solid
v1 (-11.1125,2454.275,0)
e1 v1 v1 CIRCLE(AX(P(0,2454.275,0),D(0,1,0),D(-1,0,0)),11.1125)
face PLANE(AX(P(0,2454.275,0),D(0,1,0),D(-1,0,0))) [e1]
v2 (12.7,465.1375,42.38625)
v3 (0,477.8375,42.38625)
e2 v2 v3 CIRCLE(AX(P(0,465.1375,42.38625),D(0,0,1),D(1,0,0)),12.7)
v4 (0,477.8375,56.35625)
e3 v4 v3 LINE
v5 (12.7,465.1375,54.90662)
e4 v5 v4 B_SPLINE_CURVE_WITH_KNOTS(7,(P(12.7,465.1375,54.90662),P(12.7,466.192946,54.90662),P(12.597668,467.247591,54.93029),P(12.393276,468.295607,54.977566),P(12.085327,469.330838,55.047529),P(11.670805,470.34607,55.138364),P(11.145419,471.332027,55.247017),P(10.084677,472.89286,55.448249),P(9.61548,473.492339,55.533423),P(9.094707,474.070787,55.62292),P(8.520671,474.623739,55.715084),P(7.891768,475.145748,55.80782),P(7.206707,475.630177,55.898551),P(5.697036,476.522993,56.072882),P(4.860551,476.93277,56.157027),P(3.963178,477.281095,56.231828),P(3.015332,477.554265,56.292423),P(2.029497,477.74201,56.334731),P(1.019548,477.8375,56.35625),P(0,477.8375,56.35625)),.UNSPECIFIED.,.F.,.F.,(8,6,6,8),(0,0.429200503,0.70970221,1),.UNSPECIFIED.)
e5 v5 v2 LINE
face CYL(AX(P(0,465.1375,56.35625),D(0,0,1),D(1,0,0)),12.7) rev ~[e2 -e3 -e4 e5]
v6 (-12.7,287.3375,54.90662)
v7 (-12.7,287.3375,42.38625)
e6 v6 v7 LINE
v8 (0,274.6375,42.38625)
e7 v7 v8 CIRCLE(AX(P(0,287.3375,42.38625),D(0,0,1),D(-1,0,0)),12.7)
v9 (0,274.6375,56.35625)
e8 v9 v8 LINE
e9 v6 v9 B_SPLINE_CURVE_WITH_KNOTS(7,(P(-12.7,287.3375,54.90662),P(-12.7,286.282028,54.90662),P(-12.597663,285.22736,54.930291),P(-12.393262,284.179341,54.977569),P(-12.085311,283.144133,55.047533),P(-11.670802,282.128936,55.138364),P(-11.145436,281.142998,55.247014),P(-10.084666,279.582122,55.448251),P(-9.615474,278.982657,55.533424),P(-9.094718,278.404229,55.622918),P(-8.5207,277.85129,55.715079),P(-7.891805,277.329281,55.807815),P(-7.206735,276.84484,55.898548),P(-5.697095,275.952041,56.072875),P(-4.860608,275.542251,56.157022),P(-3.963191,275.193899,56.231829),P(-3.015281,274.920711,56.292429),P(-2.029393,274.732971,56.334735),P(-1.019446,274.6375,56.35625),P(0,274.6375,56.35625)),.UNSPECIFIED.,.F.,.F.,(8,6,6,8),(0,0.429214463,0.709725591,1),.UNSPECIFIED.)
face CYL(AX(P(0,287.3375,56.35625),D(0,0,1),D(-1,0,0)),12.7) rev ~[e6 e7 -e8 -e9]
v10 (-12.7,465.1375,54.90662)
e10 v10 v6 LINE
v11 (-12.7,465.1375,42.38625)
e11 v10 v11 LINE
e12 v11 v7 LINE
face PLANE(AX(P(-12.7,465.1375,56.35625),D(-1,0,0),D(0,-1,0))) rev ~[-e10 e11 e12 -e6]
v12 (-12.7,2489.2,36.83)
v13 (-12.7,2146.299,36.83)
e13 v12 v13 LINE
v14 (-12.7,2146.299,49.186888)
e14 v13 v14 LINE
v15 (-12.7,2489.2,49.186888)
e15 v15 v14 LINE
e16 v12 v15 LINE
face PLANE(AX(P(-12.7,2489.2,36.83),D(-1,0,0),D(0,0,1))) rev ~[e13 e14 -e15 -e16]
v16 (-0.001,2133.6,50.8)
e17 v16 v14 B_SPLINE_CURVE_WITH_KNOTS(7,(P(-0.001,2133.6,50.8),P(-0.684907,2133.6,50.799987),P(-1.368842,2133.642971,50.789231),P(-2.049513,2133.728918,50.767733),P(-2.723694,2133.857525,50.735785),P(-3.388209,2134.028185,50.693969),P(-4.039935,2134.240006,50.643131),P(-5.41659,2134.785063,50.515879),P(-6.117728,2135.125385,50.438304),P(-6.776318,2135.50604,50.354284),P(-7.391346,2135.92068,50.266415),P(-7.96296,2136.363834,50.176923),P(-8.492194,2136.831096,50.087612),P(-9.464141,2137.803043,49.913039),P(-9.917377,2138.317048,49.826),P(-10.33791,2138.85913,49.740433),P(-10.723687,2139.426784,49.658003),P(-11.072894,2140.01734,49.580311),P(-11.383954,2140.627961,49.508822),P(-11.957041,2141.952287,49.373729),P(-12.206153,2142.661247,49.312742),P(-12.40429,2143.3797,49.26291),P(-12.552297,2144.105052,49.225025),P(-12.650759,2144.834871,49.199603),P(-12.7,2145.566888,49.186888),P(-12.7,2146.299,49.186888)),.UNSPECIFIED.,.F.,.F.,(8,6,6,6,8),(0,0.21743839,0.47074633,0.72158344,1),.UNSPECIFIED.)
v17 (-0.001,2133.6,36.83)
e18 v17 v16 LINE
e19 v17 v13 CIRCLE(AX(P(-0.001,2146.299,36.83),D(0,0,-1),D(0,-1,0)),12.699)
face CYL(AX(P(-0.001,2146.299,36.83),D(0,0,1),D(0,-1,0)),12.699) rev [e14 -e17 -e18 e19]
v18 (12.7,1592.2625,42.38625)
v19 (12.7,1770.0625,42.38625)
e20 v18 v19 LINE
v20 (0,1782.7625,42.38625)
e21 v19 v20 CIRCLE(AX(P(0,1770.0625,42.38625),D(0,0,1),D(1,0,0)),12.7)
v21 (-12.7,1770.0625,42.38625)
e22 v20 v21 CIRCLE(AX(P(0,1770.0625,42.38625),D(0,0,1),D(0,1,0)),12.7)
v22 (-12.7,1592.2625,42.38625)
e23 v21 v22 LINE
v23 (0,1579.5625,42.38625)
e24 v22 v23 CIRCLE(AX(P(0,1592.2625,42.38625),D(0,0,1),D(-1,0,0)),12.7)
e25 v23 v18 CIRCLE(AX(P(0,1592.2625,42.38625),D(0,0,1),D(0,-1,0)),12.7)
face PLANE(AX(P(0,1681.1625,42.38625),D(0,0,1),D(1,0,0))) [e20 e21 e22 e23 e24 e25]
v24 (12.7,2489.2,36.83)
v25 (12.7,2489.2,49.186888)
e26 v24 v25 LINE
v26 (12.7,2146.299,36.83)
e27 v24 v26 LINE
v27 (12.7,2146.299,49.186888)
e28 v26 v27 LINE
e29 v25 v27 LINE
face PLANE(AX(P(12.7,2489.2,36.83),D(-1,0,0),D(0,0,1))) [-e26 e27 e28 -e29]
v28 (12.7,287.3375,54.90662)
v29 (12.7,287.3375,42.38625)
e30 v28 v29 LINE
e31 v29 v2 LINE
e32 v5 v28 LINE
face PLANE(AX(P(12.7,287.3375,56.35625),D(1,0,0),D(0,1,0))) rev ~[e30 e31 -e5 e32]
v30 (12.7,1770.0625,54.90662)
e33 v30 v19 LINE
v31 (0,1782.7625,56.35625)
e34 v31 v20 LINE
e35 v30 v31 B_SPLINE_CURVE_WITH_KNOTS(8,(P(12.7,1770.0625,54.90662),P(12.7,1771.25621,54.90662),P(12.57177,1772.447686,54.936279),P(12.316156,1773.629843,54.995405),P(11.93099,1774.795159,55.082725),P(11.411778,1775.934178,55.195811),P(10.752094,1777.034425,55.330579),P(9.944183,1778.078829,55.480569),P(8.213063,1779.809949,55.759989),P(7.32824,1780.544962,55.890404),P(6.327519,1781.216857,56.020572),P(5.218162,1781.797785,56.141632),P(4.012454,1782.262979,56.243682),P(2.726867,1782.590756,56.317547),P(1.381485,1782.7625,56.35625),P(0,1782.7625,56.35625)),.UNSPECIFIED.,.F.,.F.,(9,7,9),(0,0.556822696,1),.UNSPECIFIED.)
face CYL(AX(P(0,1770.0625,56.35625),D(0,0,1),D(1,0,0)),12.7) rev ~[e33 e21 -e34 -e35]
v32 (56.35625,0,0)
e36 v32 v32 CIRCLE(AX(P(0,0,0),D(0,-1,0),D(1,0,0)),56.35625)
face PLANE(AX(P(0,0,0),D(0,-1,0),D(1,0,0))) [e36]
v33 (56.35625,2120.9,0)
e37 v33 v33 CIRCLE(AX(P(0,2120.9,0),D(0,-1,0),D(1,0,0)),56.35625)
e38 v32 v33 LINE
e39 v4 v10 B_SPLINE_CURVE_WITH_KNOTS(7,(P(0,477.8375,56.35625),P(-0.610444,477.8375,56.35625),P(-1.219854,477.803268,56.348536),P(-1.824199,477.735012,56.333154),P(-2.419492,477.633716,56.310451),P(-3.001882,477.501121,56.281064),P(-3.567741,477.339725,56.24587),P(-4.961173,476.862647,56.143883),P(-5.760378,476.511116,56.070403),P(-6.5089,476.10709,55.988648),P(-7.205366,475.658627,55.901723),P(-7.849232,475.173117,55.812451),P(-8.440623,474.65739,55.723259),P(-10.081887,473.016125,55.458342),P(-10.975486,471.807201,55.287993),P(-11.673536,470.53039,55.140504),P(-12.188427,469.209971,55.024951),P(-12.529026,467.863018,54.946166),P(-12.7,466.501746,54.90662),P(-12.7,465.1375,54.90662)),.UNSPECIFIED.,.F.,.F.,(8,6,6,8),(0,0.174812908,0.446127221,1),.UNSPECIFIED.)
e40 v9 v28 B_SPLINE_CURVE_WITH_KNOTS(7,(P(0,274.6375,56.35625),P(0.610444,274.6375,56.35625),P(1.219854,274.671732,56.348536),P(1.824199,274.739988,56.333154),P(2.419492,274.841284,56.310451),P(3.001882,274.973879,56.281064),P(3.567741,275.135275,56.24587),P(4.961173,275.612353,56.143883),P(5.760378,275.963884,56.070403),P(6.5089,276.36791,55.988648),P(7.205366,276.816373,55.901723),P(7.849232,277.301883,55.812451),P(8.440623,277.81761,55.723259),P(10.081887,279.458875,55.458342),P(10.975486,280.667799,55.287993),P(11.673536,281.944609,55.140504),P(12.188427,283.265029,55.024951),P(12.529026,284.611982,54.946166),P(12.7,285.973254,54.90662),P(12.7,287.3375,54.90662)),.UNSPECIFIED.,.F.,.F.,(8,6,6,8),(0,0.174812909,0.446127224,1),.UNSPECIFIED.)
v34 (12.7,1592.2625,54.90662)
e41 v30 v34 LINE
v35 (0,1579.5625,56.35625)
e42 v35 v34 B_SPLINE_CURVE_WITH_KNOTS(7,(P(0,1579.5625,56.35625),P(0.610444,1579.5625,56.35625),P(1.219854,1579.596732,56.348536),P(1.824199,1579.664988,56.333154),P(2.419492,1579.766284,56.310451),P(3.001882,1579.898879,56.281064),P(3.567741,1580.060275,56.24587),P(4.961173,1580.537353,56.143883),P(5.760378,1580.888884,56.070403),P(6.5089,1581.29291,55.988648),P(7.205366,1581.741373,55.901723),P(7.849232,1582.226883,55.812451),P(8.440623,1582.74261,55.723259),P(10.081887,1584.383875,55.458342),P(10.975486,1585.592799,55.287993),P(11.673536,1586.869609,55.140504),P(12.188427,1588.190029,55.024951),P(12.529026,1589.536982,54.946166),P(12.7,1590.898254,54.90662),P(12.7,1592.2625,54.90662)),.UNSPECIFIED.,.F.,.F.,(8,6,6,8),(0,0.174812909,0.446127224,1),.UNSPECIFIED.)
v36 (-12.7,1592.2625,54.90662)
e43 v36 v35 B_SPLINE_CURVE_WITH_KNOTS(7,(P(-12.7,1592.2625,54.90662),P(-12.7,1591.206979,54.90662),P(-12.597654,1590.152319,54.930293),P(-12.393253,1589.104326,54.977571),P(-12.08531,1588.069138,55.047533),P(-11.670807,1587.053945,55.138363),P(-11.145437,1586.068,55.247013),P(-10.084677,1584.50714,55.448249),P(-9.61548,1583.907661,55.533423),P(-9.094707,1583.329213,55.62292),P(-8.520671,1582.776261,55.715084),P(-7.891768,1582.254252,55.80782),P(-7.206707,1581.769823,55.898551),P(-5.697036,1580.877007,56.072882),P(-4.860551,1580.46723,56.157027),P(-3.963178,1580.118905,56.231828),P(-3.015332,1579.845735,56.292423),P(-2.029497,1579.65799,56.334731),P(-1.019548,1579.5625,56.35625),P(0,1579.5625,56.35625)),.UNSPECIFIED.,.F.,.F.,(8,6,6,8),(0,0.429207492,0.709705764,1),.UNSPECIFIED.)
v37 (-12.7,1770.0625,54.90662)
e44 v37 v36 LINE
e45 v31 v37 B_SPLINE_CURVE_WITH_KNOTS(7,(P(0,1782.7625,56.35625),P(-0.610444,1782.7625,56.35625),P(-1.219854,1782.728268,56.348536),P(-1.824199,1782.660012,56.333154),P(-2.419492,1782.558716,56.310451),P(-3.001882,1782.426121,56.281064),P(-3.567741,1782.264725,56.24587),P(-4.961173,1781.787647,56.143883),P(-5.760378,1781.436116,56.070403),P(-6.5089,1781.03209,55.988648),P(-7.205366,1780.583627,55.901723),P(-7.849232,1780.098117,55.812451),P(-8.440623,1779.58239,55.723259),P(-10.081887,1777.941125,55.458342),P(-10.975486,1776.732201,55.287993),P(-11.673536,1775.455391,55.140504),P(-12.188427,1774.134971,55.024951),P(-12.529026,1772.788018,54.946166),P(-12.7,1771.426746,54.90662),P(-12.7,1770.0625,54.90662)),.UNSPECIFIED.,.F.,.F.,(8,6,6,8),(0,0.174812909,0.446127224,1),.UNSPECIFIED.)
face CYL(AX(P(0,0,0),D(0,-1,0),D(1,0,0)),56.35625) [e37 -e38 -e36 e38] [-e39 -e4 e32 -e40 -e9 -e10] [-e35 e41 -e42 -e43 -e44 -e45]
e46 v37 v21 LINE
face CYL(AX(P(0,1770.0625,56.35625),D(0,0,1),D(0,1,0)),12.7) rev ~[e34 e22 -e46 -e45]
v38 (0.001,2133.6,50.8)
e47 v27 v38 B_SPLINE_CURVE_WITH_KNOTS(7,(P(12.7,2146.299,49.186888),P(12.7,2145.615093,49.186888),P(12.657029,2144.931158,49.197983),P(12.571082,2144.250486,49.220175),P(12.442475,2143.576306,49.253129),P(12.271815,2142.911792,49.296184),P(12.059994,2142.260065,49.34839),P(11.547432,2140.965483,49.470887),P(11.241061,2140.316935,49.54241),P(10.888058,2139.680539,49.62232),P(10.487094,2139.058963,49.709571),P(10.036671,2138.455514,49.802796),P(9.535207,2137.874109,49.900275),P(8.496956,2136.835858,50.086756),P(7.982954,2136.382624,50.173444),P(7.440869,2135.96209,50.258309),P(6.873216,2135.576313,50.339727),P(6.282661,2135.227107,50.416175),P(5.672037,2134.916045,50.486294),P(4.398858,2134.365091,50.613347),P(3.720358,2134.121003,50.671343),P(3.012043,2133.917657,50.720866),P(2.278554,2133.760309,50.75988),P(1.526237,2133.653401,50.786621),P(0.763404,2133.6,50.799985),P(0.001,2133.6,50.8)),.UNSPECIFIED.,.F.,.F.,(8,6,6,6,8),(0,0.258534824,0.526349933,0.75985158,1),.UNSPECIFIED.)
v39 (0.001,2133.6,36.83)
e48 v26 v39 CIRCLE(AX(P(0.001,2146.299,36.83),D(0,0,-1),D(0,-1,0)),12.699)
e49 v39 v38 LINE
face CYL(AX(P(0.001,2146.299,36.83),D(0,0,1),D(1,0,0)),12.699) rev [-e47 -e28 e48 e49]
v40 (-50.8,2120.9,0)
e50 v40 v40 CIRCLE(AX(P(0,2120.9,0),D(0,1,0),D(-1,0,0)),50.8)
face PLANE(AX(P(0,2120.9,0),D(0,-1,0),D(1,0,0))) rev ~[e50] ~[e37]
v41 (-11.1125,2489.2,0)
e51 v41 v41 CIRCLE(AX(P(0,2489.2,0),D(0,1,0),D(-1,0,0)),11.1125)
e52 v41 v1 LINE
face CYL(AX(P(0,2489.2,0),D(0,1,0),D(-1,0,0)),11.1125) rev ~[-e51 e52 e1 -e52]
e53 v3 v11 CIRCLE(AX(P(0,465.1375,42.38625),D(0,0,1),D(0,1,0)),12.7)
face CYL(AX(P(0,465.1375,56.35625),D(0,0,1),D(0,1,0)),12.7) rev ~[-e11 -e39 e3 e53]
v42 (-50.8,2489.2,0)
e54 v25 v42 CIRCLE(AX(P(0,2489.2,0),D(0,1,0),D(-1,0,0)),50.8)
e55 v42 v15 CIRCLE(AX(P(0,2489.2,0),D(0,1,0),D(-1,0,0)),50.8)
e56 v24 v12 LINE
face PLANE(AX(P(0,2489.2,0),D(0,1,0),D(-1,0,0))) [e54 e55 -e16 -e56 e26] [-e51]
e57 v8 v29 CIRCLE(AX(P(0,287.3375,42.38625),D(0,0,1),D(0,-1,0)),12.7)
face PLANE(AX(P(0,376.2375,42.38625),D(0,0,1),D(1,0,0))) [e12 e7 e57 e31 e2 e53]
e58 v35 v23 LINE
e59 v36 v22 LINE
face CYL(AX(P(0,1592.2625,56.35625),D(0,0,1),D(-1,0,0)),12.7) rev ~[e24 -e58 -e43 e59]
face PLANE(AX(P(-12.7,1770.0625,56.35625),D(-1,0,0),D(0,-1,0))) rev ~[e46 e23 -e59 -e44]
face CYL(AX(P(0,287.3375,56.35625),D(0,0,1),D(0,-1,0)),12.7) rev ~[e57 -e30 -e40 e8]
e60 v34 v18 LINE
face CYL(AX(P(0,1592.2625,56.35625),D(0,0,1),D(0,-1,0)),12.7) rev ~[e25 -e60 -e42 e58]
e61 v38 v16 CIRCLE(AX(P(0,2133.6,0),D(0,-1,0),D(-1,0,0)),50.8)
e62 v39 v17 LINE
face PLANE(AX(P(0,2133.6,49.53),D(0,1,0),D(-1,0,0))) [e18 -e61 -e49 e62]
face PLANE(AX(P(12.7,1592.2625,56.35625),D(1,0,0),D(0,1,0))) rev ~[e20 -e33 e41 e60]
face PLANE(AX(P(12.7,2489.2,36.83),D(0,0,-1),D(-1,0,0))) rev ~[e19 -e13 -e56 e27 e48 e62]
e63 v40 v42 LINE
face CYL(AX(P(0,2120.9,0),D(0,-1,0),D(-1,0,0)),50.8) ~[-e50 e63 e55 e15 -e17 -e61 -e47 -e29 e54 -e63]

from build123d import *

# Parameters (mm, degrees)
F0_R      = 56.35625
F1_DEPTH  = 2120.9
F2_R      = 50.8
F3_DEPTH  = 368.3
F4_R      = 11.1125
F5_DEPTH  = 34.925
F6_W      = 25.4
F6_H      = 25.4
F7_DEPTH  = 355.6
F8_R      = 12.699
F11_DEPTH = 13.97


# Not quite as in the source:
# - a fillet or chamfer is up to 0.001 mm smaller than in the source, because OpenCascade refuses the exact size


with BuildPart() as f1:
    # F0 (on Front) → F1 (new body)
    with BuildSketch(Plane.XZ):
        Circle(F0_R)
    extrude(amount=-F1_DEPTH)

    # F2 (on face) → F3 (join)
    with BuildSketch(Plane(origin=(0, 2120.9, 0), x_dir=(-1, 0, 0), z_dir=(0, 1, 0))):
        Circle(F2_R)
    extrude(amount=F3_DEPTH)

    # F4 (on face) → F5 (cut)
    with BuildSketch(Plane(origin=(0, 2489.2, 0), x_dir=(-1, 0, 0), z_dir=(0, 1, 0))):
        Circle(F4_R)
    extrude(amount=-F5_DEPTH, mode=Mode.SUBTRACT)

    # F6 (on face) → F7 (cut)
    with BuildSketch(Plane(origin=(0, 2489.2, 0), x_dir=(-1, 0, 0), z_dir=(0, 1, 0))):
        with Locations((0, 49.53)):
            Rectangle(F6_W, F6_H)
    extrude(amount=-F7_DEPTH, mode=Mode.SUBTRACT)

    # F8 (radius 12.7 in the source; OpenCascade refuses exactly that, so slightly less here)
    f8_edges = [f1.edges().sort_by_distance(p)[0] for p in [
        (12.7, 2133.6, 43.008444),
        (-12.7, 2133.6, 43.008444),
    ]]
    fillet(f8_edges, radius=F8_R)

    # F10 (on offset) → F11 (cut)
    with BuildSketch(Plane.XY.offset(56.35625)):
        with BuildLine():
            ThreePointArc((0, 477.8375), (-8.9802561211, 474.1177561211), (-12.7, 465.1375))
            Line((-12.7, 465.1375), (-12.7, 287.3375))
            ThreePointArc((-12.7, 287.3375), (-8.9802561211, 278.3572438789), (0, 274.6375))
            ThreePointArc((0, 274.6375), (8.9802561211, 278.3572438789), (12.7, 287.3375))
            Line((12.7, 287.3375), (12.7, 465.1375))
            ThreePointArc((12.7, 465.1375), (8.9802561211, 474.1177561211), (0, 477.8375))
        make_face()
        with BuildLine():
            ThreePointArc((0, 1782.7625), (-8.9802561211, 1779.0427561211), (-12.7, 1770.0625))
            Line((-12.7, 1770.0625), (-12.7, 1592.2625))
            ThreePointArc((-12.7, 1592.2625), (-8.9802561211, 1583.2822438789), (0, 1579.5625))
            ThreePointArc((0, 1579.5625), (8.9802561211, 1583.2822438789), (12.7, 1592.2625))
            Line((12.7, 1592.2625), (12.7, 1770.0625))
            ThreePointArc((12.7, 1770.0625), (8.9802561211, 1779.0427561211), (0, 1782.7625))
        make_face()
    extrude(amount=-F11_DEPTH, mode=Mode.SUBTRACT)


solid = f1.part
